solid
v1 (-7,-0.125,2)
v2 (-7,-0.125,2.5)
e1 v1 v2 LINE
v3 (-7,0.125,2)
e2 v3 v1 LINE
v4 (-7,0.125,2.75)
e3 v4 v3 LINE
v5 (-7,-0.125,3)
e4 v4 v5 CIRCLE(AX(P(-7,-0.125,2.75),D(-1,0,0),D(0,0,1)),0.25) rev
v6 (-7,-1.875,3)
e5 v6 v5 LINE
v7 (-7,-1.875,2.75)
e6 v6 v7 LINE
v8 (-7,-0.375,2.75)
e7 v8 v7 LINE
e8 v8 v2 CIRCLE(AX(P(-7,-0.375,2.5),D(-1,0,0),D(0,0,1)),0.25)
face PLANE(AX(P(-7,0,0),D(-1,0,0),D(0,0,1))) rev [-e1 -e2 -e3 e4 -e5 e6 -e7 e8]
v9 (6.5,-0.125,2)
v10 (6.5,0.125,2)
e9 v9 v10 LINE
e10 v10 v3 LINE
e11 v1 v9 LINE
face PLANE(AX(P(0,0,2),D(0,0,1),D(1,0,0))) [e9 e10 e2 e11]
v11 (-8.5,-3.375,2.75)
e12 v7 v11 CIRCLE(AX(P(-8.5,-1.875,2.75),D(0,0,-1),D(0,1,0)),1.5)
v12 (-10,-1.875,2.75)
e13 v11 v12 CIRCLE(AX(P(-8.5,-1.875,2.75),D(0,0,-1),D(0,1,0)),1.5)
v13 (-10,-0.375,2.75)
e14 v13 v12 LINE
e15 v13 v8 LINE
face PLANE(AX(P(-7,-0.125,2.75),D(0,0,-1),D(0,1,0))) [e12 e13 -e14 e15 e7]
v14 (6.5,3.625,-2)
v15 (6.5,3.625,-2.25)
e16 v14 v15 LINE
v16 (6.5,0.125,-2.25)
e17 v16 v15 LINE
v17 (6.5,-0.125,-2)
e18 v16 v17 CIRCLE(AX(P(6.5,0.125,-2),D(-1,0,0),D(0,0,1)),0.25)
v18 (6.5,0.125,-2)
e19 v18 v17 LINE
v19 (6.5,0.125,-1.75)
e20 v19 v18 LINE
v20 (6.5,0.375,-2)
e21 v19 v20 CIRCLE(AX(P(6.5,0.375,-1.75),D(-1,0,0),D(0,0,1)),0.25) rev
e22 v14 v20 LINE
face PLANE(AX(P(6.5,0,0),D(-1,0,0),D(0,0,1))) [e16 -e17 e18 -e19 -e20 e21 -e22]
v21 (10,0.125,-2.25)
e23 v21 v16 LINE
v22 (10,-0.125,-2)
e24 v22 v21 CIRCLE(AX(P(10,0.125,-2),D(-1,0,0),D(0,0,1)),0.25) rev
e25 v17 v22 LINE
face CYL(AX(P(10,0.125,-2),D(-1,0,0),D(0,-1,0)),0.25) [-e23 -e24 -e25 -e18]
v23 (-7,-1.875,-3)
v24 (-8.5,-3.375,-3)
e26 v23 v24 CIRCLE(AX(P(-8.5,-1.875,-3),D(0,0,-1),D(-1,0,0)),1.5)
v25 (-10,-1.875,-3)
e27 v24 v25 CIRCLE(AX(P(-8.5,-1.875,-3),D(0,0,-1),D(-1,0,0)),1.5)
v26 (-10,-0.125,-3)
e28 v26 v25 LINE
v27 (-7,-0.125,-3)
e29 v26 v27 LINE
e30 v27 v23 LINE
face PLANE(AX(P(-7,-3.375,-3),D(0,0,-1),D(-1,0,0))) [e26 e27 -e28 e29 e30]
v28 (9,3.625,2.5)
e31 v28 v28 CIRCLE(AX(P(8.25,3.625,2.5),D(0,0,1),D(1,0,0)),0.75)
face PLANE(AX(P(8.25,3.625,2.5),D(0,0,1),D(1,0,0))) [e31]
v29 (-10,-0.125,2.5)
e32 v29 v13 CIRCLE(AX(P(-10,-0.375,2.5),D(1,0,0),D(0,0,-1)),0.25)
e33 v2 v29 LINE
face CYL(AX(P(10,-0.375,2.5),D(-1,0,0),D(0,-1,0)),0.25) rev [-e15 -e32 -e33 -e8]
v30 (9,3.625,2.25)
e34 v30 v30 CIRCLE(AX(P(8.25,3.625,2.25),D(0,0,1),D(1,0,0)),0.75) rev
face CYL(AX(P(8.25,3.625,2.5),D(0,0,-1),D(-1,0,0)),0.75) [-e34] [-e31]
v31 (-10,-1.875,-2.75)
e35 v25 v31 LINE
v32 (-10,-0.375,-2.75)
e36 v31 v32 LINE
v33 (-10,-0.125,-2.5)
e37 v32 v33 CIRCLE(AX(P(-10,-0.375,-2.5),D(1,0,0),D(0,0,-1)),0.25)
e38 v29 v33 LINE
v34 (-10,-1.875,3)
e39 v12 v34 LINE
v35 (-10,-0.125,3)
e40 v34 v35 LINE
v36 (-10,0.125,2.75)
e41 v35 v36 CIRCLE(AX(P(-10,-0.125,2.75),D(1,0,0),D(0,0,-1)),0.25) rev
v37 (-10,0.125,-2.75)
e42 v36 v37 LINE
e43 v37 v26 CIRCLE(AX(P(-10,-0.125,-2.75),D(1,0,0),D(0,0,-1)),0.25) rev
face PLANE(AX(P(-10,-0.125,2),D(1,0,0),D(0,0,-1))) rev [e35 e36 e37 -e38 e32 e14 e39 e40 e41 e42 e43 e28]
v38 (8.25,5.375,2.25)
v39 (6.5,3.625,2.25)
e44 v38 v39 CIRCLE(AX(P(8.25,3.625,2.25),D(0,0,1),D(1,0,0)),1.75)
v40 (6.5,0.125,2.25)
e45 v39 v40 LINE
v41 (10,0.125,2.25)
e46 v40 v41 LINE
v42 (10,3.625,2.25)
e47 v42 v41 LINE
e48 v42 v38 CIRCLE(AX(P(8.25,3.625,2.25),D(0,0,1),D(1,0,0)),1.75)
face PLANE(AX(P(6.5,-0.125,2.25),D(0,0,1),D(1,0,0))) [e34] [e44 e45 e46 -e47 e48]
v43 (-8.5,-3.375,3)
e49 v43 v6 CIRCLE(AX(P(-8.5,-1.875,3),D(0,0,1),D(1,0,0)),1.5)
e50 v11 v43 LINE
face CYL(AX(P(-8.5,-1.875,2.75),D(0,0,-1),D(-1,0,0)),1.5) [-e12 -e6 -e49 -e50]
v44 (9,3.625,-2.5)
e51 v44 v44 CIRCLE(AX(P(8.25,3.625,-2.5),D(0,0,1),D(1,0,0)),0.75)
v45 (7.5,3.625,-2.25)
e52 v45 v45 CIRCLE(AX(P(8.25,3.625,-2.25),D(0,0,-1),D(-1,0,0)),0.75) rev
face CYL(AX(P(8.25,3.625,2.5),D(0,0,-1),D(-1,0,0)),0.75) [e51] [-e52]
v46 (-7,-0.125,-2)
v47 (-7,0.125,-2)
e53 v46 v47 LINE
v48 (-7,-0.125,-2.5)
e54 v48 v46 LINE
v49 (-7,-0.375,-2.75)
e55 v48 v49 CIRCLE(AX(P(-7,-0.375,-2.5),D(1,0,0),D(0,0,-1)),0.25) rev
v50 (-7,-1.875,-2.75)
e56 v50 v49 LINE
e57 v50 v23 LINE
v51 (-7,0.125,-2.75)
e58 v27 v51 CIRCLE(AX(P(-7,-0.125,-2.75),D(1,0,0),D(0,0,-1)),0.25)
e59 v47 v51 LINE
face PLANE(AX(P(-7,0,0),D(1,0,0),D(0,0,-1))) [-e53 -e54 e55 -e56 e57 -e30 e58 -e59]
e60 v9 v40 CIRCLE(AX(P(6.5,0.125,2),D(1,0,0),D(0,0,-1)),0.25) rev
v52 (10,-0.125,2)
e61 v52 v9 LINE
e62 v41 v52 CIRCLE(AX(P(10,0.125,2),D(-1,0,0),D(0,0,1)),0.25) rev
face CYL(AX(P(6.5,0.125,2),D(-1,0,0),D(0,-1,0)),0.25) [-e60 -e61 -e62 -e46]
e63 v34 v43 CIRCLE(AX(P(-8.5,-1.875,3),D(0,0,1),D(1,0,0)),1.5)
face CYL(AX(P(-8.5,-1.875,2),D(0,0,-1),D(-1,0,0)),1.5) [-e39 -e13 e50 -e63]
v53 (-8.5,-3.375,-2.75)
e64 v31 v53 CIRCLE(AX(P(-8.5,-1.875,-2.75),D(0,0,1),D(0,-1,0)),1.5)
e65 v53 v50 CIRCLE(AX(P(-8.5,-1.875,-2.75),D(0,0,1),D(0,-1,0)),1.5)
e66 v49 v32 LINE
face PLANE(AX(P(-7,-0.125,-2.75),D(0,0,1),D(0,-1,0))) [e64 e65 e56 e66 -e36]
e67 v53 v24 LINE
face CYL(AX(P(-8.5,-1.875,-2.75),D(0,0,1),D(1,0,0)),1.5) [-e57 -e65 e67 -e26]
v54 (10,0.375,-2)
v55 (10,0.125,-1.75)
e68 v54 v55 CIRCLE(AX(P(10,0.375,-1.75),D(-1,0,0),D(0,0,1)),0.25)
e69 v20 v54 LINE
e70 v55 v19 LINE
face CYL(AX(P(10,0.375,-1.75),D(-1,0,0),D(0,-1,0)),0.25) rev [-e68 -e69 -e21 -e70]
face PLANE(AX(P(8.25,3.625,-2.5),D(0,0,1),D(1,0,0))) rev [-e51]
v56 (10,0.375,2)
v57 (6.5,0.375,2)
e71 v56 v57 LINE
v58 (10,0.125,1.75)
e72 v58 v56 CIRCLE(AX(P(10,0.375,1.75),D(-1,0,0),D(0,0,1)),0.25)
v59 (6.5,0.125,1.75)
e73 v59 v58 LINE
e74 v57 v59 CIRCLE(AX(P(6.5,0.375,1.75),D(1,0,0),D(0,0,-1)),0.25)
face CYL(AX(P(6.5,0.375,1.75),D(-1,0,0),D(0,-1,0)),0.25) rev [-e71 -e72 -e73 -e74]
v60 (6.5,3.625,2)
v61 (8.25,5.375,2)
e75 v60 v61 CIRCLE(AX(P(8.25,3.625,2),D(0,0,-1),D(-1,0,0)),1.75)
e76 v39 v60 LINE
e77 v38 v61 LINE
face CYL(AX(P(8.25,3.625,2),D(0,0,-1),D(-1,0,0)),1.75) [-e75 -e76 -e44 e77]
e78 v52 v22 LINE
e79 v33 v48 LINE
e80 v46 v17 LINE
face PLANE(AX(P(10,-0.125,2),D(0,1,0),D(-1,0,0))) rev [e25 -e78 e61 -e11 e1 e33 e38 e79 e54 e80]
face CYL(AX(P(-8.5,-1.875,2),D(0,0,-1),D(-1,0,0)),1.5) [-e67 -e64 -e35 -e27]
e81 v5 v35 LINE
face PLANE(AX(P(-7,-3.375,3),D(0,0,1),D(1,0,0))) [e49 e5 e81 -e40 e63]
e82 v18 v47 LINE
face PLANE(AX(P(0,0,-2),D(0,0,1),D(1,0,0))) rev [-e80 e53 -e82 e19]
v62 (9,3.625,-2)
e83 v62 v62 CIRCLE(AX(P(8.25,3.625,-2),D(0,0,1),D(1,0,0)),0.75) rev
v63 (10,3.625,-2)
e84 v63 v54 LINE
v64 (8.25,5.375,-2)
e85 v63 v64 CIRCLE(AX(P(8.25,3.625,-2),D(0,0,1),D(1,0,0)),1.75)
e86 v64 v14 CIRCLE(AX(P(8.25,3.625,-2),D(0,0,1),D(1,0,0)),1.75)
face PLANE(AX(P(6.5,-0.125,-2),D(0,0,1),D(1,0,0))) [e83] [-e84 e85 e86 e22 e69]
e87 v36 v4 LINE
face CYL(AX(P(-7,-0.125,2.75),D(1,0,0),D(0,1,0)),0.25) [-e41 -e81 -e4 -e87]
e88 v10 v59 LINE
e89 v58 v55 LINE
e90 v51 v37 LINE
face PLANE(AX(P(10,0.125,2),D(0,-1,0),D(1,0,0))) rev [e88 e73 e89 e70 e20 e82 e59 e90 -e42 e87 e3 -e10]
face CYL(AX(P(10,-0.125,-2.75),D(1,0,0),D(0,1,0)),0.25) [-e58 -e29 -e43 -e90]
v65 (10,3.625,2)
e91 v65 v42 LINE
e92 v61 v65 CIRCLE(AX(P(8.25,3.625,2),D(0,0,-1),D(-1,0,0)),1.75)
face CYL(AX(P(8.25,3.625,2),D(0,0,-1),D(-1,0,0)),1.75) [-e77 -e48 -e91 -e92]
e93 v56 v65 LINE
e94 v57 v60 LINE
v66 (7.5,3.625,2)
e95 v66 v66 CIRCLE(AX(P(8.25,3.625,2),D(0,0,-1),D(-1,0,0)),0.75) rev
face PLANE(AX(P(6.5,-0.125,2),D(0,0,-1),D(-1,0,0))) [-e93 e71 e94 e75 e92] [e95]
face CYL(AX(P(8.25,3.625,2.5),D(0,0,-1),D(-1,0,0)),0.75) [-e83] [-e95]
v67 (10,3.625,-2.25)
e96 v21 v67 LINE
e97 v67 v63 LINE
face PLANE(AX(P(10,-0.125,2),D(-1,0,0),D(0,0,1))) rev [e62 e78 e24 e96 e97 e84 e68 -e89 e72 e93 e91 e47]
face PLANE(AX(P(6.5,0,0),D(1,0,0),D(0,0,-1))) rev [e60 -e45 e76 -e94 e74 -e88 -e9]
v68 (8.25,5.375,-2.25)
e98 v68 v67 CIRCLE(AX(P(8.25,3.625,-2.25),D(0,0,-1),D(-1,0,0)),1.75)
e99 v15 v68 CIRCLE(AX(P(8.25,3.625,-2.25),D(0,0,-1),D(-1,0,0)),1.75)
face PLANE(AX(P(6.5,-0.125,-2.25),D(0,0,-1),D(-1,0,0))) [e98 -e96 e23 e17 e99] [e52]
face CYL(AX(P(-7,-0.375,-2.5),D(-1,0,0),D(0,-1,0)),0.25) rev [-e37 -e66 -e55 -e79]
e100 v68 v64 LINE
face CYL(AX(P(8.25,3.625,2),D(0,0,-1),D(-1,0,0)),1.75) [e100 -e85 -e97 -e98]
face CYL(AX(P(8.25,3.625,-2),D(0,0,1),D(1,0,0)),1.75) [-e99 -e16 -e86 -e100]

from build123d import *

# Parameters (mm, degrees)
SKETCH1_W           = 20
SKETCH1_H           = 0.25
BOSS_EXTRUDE1_DEPTH = 2
SKETCH2_W           = 0.25
SKETCH2_H           = 5.5
BOSS_EXTRUDE2_DEPTH = 3.5
FILLET1_R           = 0.25
FILLET2_R           = 1.75
BOSS_EXTRUDE3_START = -2.25
SKETCH3_R           = 0.75
BOSS_EXTRUDE3_DEPTH = 2.5
BOSS_EXTRUDE5_DEPTH = 3
FILLET3_R           = 1.5
FILLET4_R           = 0.25


with BuildPart() as part:
    # Sketch1 → Boss-Extrude1 (new, symmetric)
    with BuildSketch(Plane.XY):
        Rectangle(SKETCH1_W, SKETCH1_H)
    extrude(amount=BOSS_EXTRUDE1_DEPTH, both=True)

    # Sketch2 → Boss-Extrude2 (add)
    with BuildSketch(Plane(origin=(10, 0, 0), x_dir=(0, 0, -1), z_dir=(1, 0, 0))):
        with Locations((-2.125, 2.625)):
            Rectangle(SKETCH2_W, SKETCH2_H)
        with Locations((2.125, 2.625)):
            Rectangle(SKETCH2_W, SKETCH2_H)
    extrude(amount=-BOSS_EXTRUDE2_DEPTH)

    # Fillet1
    fillet1_edges = [part.edges().sort_by_distance(p)[0] for p in [
        (8.25, -0.125, -2.25),
        (8.25, -0.125, 2.25),
        (8.25, 0.125, -2),
        (8.25, 0.125, 2),
    ]]
    fillet(fillet1_edges, radius=FILLET1_R)

    # Fillet2
    fillet2_edges = [part.edges().sort_by_distance(p)[0] for p in [
        (10, 5.375, -2.125),
        (6.5, 5.375, -2.125),
        (6.5, 5.375, 2.125),
        (10, 5.375, 2.125),
    ]]
    fillet(fillet2_edges, radius=FILLET2_R - 0.0001)  # a hair under: the kernel refuses the full size

    # Sketch3 → Boss-Extrude3 (add, symmetric)
    with BuildSketch(Plane.XY.offset(2.25).offset(BOSS_EXTRUDE3_START)):
        with Locations(Location((8.25, 3.625, 0), (0, 0, 180))):
            Circle(SKETCH3_R)
    extrude(amount=BOSS_EXTRUDE3_DEPTH, both=True)

    # Sketch5 → Boss-Extrude5 (add)
    with BuildSketch(Plane.ZY.offset(10)):
        Polygon((-2, -0.125), (-2.75, -0.125), (-2.75, -3.375), (-3, -3.375), (-3, 0.125), (-2, 0.125), align=None)
        Polygon((3, 0.125), (2, 0.125), (2, -0.125), (2.75, -0.125), (2.75, -3.375), (3, -3.375), align=None)
    extrude(amount=-BOSS_EXTRUDE5_DEPTH)

    # Fillet3
    fillet3_edges = [part.edges().sort_by_distance(p)[0] for p in [
        (-10, -3.375, 2.875),
        (-7, -3.375, 2.875),
        (-7, -3.375, -2.875),
        (-10, -3.375, -2.875),
    ]]
    fillet(fillet3_edges, radius=FILLET3_R - 0.0001)  # a hair under: the kernel refuses the full size

    # Fillet4
    fillet4_edges = [part.edges().sort_by_distance(p)[0] for p in [
        (-8.5, -0.125, -2.75),
        (-8.5, 0.125, -3),
        (-8.5, 0.125, 3),
        (-8.5, -0.125, 2.75),
    ]]
    fillet(fillet4_edges, radius=FILLET4_R)


solid = part.part
